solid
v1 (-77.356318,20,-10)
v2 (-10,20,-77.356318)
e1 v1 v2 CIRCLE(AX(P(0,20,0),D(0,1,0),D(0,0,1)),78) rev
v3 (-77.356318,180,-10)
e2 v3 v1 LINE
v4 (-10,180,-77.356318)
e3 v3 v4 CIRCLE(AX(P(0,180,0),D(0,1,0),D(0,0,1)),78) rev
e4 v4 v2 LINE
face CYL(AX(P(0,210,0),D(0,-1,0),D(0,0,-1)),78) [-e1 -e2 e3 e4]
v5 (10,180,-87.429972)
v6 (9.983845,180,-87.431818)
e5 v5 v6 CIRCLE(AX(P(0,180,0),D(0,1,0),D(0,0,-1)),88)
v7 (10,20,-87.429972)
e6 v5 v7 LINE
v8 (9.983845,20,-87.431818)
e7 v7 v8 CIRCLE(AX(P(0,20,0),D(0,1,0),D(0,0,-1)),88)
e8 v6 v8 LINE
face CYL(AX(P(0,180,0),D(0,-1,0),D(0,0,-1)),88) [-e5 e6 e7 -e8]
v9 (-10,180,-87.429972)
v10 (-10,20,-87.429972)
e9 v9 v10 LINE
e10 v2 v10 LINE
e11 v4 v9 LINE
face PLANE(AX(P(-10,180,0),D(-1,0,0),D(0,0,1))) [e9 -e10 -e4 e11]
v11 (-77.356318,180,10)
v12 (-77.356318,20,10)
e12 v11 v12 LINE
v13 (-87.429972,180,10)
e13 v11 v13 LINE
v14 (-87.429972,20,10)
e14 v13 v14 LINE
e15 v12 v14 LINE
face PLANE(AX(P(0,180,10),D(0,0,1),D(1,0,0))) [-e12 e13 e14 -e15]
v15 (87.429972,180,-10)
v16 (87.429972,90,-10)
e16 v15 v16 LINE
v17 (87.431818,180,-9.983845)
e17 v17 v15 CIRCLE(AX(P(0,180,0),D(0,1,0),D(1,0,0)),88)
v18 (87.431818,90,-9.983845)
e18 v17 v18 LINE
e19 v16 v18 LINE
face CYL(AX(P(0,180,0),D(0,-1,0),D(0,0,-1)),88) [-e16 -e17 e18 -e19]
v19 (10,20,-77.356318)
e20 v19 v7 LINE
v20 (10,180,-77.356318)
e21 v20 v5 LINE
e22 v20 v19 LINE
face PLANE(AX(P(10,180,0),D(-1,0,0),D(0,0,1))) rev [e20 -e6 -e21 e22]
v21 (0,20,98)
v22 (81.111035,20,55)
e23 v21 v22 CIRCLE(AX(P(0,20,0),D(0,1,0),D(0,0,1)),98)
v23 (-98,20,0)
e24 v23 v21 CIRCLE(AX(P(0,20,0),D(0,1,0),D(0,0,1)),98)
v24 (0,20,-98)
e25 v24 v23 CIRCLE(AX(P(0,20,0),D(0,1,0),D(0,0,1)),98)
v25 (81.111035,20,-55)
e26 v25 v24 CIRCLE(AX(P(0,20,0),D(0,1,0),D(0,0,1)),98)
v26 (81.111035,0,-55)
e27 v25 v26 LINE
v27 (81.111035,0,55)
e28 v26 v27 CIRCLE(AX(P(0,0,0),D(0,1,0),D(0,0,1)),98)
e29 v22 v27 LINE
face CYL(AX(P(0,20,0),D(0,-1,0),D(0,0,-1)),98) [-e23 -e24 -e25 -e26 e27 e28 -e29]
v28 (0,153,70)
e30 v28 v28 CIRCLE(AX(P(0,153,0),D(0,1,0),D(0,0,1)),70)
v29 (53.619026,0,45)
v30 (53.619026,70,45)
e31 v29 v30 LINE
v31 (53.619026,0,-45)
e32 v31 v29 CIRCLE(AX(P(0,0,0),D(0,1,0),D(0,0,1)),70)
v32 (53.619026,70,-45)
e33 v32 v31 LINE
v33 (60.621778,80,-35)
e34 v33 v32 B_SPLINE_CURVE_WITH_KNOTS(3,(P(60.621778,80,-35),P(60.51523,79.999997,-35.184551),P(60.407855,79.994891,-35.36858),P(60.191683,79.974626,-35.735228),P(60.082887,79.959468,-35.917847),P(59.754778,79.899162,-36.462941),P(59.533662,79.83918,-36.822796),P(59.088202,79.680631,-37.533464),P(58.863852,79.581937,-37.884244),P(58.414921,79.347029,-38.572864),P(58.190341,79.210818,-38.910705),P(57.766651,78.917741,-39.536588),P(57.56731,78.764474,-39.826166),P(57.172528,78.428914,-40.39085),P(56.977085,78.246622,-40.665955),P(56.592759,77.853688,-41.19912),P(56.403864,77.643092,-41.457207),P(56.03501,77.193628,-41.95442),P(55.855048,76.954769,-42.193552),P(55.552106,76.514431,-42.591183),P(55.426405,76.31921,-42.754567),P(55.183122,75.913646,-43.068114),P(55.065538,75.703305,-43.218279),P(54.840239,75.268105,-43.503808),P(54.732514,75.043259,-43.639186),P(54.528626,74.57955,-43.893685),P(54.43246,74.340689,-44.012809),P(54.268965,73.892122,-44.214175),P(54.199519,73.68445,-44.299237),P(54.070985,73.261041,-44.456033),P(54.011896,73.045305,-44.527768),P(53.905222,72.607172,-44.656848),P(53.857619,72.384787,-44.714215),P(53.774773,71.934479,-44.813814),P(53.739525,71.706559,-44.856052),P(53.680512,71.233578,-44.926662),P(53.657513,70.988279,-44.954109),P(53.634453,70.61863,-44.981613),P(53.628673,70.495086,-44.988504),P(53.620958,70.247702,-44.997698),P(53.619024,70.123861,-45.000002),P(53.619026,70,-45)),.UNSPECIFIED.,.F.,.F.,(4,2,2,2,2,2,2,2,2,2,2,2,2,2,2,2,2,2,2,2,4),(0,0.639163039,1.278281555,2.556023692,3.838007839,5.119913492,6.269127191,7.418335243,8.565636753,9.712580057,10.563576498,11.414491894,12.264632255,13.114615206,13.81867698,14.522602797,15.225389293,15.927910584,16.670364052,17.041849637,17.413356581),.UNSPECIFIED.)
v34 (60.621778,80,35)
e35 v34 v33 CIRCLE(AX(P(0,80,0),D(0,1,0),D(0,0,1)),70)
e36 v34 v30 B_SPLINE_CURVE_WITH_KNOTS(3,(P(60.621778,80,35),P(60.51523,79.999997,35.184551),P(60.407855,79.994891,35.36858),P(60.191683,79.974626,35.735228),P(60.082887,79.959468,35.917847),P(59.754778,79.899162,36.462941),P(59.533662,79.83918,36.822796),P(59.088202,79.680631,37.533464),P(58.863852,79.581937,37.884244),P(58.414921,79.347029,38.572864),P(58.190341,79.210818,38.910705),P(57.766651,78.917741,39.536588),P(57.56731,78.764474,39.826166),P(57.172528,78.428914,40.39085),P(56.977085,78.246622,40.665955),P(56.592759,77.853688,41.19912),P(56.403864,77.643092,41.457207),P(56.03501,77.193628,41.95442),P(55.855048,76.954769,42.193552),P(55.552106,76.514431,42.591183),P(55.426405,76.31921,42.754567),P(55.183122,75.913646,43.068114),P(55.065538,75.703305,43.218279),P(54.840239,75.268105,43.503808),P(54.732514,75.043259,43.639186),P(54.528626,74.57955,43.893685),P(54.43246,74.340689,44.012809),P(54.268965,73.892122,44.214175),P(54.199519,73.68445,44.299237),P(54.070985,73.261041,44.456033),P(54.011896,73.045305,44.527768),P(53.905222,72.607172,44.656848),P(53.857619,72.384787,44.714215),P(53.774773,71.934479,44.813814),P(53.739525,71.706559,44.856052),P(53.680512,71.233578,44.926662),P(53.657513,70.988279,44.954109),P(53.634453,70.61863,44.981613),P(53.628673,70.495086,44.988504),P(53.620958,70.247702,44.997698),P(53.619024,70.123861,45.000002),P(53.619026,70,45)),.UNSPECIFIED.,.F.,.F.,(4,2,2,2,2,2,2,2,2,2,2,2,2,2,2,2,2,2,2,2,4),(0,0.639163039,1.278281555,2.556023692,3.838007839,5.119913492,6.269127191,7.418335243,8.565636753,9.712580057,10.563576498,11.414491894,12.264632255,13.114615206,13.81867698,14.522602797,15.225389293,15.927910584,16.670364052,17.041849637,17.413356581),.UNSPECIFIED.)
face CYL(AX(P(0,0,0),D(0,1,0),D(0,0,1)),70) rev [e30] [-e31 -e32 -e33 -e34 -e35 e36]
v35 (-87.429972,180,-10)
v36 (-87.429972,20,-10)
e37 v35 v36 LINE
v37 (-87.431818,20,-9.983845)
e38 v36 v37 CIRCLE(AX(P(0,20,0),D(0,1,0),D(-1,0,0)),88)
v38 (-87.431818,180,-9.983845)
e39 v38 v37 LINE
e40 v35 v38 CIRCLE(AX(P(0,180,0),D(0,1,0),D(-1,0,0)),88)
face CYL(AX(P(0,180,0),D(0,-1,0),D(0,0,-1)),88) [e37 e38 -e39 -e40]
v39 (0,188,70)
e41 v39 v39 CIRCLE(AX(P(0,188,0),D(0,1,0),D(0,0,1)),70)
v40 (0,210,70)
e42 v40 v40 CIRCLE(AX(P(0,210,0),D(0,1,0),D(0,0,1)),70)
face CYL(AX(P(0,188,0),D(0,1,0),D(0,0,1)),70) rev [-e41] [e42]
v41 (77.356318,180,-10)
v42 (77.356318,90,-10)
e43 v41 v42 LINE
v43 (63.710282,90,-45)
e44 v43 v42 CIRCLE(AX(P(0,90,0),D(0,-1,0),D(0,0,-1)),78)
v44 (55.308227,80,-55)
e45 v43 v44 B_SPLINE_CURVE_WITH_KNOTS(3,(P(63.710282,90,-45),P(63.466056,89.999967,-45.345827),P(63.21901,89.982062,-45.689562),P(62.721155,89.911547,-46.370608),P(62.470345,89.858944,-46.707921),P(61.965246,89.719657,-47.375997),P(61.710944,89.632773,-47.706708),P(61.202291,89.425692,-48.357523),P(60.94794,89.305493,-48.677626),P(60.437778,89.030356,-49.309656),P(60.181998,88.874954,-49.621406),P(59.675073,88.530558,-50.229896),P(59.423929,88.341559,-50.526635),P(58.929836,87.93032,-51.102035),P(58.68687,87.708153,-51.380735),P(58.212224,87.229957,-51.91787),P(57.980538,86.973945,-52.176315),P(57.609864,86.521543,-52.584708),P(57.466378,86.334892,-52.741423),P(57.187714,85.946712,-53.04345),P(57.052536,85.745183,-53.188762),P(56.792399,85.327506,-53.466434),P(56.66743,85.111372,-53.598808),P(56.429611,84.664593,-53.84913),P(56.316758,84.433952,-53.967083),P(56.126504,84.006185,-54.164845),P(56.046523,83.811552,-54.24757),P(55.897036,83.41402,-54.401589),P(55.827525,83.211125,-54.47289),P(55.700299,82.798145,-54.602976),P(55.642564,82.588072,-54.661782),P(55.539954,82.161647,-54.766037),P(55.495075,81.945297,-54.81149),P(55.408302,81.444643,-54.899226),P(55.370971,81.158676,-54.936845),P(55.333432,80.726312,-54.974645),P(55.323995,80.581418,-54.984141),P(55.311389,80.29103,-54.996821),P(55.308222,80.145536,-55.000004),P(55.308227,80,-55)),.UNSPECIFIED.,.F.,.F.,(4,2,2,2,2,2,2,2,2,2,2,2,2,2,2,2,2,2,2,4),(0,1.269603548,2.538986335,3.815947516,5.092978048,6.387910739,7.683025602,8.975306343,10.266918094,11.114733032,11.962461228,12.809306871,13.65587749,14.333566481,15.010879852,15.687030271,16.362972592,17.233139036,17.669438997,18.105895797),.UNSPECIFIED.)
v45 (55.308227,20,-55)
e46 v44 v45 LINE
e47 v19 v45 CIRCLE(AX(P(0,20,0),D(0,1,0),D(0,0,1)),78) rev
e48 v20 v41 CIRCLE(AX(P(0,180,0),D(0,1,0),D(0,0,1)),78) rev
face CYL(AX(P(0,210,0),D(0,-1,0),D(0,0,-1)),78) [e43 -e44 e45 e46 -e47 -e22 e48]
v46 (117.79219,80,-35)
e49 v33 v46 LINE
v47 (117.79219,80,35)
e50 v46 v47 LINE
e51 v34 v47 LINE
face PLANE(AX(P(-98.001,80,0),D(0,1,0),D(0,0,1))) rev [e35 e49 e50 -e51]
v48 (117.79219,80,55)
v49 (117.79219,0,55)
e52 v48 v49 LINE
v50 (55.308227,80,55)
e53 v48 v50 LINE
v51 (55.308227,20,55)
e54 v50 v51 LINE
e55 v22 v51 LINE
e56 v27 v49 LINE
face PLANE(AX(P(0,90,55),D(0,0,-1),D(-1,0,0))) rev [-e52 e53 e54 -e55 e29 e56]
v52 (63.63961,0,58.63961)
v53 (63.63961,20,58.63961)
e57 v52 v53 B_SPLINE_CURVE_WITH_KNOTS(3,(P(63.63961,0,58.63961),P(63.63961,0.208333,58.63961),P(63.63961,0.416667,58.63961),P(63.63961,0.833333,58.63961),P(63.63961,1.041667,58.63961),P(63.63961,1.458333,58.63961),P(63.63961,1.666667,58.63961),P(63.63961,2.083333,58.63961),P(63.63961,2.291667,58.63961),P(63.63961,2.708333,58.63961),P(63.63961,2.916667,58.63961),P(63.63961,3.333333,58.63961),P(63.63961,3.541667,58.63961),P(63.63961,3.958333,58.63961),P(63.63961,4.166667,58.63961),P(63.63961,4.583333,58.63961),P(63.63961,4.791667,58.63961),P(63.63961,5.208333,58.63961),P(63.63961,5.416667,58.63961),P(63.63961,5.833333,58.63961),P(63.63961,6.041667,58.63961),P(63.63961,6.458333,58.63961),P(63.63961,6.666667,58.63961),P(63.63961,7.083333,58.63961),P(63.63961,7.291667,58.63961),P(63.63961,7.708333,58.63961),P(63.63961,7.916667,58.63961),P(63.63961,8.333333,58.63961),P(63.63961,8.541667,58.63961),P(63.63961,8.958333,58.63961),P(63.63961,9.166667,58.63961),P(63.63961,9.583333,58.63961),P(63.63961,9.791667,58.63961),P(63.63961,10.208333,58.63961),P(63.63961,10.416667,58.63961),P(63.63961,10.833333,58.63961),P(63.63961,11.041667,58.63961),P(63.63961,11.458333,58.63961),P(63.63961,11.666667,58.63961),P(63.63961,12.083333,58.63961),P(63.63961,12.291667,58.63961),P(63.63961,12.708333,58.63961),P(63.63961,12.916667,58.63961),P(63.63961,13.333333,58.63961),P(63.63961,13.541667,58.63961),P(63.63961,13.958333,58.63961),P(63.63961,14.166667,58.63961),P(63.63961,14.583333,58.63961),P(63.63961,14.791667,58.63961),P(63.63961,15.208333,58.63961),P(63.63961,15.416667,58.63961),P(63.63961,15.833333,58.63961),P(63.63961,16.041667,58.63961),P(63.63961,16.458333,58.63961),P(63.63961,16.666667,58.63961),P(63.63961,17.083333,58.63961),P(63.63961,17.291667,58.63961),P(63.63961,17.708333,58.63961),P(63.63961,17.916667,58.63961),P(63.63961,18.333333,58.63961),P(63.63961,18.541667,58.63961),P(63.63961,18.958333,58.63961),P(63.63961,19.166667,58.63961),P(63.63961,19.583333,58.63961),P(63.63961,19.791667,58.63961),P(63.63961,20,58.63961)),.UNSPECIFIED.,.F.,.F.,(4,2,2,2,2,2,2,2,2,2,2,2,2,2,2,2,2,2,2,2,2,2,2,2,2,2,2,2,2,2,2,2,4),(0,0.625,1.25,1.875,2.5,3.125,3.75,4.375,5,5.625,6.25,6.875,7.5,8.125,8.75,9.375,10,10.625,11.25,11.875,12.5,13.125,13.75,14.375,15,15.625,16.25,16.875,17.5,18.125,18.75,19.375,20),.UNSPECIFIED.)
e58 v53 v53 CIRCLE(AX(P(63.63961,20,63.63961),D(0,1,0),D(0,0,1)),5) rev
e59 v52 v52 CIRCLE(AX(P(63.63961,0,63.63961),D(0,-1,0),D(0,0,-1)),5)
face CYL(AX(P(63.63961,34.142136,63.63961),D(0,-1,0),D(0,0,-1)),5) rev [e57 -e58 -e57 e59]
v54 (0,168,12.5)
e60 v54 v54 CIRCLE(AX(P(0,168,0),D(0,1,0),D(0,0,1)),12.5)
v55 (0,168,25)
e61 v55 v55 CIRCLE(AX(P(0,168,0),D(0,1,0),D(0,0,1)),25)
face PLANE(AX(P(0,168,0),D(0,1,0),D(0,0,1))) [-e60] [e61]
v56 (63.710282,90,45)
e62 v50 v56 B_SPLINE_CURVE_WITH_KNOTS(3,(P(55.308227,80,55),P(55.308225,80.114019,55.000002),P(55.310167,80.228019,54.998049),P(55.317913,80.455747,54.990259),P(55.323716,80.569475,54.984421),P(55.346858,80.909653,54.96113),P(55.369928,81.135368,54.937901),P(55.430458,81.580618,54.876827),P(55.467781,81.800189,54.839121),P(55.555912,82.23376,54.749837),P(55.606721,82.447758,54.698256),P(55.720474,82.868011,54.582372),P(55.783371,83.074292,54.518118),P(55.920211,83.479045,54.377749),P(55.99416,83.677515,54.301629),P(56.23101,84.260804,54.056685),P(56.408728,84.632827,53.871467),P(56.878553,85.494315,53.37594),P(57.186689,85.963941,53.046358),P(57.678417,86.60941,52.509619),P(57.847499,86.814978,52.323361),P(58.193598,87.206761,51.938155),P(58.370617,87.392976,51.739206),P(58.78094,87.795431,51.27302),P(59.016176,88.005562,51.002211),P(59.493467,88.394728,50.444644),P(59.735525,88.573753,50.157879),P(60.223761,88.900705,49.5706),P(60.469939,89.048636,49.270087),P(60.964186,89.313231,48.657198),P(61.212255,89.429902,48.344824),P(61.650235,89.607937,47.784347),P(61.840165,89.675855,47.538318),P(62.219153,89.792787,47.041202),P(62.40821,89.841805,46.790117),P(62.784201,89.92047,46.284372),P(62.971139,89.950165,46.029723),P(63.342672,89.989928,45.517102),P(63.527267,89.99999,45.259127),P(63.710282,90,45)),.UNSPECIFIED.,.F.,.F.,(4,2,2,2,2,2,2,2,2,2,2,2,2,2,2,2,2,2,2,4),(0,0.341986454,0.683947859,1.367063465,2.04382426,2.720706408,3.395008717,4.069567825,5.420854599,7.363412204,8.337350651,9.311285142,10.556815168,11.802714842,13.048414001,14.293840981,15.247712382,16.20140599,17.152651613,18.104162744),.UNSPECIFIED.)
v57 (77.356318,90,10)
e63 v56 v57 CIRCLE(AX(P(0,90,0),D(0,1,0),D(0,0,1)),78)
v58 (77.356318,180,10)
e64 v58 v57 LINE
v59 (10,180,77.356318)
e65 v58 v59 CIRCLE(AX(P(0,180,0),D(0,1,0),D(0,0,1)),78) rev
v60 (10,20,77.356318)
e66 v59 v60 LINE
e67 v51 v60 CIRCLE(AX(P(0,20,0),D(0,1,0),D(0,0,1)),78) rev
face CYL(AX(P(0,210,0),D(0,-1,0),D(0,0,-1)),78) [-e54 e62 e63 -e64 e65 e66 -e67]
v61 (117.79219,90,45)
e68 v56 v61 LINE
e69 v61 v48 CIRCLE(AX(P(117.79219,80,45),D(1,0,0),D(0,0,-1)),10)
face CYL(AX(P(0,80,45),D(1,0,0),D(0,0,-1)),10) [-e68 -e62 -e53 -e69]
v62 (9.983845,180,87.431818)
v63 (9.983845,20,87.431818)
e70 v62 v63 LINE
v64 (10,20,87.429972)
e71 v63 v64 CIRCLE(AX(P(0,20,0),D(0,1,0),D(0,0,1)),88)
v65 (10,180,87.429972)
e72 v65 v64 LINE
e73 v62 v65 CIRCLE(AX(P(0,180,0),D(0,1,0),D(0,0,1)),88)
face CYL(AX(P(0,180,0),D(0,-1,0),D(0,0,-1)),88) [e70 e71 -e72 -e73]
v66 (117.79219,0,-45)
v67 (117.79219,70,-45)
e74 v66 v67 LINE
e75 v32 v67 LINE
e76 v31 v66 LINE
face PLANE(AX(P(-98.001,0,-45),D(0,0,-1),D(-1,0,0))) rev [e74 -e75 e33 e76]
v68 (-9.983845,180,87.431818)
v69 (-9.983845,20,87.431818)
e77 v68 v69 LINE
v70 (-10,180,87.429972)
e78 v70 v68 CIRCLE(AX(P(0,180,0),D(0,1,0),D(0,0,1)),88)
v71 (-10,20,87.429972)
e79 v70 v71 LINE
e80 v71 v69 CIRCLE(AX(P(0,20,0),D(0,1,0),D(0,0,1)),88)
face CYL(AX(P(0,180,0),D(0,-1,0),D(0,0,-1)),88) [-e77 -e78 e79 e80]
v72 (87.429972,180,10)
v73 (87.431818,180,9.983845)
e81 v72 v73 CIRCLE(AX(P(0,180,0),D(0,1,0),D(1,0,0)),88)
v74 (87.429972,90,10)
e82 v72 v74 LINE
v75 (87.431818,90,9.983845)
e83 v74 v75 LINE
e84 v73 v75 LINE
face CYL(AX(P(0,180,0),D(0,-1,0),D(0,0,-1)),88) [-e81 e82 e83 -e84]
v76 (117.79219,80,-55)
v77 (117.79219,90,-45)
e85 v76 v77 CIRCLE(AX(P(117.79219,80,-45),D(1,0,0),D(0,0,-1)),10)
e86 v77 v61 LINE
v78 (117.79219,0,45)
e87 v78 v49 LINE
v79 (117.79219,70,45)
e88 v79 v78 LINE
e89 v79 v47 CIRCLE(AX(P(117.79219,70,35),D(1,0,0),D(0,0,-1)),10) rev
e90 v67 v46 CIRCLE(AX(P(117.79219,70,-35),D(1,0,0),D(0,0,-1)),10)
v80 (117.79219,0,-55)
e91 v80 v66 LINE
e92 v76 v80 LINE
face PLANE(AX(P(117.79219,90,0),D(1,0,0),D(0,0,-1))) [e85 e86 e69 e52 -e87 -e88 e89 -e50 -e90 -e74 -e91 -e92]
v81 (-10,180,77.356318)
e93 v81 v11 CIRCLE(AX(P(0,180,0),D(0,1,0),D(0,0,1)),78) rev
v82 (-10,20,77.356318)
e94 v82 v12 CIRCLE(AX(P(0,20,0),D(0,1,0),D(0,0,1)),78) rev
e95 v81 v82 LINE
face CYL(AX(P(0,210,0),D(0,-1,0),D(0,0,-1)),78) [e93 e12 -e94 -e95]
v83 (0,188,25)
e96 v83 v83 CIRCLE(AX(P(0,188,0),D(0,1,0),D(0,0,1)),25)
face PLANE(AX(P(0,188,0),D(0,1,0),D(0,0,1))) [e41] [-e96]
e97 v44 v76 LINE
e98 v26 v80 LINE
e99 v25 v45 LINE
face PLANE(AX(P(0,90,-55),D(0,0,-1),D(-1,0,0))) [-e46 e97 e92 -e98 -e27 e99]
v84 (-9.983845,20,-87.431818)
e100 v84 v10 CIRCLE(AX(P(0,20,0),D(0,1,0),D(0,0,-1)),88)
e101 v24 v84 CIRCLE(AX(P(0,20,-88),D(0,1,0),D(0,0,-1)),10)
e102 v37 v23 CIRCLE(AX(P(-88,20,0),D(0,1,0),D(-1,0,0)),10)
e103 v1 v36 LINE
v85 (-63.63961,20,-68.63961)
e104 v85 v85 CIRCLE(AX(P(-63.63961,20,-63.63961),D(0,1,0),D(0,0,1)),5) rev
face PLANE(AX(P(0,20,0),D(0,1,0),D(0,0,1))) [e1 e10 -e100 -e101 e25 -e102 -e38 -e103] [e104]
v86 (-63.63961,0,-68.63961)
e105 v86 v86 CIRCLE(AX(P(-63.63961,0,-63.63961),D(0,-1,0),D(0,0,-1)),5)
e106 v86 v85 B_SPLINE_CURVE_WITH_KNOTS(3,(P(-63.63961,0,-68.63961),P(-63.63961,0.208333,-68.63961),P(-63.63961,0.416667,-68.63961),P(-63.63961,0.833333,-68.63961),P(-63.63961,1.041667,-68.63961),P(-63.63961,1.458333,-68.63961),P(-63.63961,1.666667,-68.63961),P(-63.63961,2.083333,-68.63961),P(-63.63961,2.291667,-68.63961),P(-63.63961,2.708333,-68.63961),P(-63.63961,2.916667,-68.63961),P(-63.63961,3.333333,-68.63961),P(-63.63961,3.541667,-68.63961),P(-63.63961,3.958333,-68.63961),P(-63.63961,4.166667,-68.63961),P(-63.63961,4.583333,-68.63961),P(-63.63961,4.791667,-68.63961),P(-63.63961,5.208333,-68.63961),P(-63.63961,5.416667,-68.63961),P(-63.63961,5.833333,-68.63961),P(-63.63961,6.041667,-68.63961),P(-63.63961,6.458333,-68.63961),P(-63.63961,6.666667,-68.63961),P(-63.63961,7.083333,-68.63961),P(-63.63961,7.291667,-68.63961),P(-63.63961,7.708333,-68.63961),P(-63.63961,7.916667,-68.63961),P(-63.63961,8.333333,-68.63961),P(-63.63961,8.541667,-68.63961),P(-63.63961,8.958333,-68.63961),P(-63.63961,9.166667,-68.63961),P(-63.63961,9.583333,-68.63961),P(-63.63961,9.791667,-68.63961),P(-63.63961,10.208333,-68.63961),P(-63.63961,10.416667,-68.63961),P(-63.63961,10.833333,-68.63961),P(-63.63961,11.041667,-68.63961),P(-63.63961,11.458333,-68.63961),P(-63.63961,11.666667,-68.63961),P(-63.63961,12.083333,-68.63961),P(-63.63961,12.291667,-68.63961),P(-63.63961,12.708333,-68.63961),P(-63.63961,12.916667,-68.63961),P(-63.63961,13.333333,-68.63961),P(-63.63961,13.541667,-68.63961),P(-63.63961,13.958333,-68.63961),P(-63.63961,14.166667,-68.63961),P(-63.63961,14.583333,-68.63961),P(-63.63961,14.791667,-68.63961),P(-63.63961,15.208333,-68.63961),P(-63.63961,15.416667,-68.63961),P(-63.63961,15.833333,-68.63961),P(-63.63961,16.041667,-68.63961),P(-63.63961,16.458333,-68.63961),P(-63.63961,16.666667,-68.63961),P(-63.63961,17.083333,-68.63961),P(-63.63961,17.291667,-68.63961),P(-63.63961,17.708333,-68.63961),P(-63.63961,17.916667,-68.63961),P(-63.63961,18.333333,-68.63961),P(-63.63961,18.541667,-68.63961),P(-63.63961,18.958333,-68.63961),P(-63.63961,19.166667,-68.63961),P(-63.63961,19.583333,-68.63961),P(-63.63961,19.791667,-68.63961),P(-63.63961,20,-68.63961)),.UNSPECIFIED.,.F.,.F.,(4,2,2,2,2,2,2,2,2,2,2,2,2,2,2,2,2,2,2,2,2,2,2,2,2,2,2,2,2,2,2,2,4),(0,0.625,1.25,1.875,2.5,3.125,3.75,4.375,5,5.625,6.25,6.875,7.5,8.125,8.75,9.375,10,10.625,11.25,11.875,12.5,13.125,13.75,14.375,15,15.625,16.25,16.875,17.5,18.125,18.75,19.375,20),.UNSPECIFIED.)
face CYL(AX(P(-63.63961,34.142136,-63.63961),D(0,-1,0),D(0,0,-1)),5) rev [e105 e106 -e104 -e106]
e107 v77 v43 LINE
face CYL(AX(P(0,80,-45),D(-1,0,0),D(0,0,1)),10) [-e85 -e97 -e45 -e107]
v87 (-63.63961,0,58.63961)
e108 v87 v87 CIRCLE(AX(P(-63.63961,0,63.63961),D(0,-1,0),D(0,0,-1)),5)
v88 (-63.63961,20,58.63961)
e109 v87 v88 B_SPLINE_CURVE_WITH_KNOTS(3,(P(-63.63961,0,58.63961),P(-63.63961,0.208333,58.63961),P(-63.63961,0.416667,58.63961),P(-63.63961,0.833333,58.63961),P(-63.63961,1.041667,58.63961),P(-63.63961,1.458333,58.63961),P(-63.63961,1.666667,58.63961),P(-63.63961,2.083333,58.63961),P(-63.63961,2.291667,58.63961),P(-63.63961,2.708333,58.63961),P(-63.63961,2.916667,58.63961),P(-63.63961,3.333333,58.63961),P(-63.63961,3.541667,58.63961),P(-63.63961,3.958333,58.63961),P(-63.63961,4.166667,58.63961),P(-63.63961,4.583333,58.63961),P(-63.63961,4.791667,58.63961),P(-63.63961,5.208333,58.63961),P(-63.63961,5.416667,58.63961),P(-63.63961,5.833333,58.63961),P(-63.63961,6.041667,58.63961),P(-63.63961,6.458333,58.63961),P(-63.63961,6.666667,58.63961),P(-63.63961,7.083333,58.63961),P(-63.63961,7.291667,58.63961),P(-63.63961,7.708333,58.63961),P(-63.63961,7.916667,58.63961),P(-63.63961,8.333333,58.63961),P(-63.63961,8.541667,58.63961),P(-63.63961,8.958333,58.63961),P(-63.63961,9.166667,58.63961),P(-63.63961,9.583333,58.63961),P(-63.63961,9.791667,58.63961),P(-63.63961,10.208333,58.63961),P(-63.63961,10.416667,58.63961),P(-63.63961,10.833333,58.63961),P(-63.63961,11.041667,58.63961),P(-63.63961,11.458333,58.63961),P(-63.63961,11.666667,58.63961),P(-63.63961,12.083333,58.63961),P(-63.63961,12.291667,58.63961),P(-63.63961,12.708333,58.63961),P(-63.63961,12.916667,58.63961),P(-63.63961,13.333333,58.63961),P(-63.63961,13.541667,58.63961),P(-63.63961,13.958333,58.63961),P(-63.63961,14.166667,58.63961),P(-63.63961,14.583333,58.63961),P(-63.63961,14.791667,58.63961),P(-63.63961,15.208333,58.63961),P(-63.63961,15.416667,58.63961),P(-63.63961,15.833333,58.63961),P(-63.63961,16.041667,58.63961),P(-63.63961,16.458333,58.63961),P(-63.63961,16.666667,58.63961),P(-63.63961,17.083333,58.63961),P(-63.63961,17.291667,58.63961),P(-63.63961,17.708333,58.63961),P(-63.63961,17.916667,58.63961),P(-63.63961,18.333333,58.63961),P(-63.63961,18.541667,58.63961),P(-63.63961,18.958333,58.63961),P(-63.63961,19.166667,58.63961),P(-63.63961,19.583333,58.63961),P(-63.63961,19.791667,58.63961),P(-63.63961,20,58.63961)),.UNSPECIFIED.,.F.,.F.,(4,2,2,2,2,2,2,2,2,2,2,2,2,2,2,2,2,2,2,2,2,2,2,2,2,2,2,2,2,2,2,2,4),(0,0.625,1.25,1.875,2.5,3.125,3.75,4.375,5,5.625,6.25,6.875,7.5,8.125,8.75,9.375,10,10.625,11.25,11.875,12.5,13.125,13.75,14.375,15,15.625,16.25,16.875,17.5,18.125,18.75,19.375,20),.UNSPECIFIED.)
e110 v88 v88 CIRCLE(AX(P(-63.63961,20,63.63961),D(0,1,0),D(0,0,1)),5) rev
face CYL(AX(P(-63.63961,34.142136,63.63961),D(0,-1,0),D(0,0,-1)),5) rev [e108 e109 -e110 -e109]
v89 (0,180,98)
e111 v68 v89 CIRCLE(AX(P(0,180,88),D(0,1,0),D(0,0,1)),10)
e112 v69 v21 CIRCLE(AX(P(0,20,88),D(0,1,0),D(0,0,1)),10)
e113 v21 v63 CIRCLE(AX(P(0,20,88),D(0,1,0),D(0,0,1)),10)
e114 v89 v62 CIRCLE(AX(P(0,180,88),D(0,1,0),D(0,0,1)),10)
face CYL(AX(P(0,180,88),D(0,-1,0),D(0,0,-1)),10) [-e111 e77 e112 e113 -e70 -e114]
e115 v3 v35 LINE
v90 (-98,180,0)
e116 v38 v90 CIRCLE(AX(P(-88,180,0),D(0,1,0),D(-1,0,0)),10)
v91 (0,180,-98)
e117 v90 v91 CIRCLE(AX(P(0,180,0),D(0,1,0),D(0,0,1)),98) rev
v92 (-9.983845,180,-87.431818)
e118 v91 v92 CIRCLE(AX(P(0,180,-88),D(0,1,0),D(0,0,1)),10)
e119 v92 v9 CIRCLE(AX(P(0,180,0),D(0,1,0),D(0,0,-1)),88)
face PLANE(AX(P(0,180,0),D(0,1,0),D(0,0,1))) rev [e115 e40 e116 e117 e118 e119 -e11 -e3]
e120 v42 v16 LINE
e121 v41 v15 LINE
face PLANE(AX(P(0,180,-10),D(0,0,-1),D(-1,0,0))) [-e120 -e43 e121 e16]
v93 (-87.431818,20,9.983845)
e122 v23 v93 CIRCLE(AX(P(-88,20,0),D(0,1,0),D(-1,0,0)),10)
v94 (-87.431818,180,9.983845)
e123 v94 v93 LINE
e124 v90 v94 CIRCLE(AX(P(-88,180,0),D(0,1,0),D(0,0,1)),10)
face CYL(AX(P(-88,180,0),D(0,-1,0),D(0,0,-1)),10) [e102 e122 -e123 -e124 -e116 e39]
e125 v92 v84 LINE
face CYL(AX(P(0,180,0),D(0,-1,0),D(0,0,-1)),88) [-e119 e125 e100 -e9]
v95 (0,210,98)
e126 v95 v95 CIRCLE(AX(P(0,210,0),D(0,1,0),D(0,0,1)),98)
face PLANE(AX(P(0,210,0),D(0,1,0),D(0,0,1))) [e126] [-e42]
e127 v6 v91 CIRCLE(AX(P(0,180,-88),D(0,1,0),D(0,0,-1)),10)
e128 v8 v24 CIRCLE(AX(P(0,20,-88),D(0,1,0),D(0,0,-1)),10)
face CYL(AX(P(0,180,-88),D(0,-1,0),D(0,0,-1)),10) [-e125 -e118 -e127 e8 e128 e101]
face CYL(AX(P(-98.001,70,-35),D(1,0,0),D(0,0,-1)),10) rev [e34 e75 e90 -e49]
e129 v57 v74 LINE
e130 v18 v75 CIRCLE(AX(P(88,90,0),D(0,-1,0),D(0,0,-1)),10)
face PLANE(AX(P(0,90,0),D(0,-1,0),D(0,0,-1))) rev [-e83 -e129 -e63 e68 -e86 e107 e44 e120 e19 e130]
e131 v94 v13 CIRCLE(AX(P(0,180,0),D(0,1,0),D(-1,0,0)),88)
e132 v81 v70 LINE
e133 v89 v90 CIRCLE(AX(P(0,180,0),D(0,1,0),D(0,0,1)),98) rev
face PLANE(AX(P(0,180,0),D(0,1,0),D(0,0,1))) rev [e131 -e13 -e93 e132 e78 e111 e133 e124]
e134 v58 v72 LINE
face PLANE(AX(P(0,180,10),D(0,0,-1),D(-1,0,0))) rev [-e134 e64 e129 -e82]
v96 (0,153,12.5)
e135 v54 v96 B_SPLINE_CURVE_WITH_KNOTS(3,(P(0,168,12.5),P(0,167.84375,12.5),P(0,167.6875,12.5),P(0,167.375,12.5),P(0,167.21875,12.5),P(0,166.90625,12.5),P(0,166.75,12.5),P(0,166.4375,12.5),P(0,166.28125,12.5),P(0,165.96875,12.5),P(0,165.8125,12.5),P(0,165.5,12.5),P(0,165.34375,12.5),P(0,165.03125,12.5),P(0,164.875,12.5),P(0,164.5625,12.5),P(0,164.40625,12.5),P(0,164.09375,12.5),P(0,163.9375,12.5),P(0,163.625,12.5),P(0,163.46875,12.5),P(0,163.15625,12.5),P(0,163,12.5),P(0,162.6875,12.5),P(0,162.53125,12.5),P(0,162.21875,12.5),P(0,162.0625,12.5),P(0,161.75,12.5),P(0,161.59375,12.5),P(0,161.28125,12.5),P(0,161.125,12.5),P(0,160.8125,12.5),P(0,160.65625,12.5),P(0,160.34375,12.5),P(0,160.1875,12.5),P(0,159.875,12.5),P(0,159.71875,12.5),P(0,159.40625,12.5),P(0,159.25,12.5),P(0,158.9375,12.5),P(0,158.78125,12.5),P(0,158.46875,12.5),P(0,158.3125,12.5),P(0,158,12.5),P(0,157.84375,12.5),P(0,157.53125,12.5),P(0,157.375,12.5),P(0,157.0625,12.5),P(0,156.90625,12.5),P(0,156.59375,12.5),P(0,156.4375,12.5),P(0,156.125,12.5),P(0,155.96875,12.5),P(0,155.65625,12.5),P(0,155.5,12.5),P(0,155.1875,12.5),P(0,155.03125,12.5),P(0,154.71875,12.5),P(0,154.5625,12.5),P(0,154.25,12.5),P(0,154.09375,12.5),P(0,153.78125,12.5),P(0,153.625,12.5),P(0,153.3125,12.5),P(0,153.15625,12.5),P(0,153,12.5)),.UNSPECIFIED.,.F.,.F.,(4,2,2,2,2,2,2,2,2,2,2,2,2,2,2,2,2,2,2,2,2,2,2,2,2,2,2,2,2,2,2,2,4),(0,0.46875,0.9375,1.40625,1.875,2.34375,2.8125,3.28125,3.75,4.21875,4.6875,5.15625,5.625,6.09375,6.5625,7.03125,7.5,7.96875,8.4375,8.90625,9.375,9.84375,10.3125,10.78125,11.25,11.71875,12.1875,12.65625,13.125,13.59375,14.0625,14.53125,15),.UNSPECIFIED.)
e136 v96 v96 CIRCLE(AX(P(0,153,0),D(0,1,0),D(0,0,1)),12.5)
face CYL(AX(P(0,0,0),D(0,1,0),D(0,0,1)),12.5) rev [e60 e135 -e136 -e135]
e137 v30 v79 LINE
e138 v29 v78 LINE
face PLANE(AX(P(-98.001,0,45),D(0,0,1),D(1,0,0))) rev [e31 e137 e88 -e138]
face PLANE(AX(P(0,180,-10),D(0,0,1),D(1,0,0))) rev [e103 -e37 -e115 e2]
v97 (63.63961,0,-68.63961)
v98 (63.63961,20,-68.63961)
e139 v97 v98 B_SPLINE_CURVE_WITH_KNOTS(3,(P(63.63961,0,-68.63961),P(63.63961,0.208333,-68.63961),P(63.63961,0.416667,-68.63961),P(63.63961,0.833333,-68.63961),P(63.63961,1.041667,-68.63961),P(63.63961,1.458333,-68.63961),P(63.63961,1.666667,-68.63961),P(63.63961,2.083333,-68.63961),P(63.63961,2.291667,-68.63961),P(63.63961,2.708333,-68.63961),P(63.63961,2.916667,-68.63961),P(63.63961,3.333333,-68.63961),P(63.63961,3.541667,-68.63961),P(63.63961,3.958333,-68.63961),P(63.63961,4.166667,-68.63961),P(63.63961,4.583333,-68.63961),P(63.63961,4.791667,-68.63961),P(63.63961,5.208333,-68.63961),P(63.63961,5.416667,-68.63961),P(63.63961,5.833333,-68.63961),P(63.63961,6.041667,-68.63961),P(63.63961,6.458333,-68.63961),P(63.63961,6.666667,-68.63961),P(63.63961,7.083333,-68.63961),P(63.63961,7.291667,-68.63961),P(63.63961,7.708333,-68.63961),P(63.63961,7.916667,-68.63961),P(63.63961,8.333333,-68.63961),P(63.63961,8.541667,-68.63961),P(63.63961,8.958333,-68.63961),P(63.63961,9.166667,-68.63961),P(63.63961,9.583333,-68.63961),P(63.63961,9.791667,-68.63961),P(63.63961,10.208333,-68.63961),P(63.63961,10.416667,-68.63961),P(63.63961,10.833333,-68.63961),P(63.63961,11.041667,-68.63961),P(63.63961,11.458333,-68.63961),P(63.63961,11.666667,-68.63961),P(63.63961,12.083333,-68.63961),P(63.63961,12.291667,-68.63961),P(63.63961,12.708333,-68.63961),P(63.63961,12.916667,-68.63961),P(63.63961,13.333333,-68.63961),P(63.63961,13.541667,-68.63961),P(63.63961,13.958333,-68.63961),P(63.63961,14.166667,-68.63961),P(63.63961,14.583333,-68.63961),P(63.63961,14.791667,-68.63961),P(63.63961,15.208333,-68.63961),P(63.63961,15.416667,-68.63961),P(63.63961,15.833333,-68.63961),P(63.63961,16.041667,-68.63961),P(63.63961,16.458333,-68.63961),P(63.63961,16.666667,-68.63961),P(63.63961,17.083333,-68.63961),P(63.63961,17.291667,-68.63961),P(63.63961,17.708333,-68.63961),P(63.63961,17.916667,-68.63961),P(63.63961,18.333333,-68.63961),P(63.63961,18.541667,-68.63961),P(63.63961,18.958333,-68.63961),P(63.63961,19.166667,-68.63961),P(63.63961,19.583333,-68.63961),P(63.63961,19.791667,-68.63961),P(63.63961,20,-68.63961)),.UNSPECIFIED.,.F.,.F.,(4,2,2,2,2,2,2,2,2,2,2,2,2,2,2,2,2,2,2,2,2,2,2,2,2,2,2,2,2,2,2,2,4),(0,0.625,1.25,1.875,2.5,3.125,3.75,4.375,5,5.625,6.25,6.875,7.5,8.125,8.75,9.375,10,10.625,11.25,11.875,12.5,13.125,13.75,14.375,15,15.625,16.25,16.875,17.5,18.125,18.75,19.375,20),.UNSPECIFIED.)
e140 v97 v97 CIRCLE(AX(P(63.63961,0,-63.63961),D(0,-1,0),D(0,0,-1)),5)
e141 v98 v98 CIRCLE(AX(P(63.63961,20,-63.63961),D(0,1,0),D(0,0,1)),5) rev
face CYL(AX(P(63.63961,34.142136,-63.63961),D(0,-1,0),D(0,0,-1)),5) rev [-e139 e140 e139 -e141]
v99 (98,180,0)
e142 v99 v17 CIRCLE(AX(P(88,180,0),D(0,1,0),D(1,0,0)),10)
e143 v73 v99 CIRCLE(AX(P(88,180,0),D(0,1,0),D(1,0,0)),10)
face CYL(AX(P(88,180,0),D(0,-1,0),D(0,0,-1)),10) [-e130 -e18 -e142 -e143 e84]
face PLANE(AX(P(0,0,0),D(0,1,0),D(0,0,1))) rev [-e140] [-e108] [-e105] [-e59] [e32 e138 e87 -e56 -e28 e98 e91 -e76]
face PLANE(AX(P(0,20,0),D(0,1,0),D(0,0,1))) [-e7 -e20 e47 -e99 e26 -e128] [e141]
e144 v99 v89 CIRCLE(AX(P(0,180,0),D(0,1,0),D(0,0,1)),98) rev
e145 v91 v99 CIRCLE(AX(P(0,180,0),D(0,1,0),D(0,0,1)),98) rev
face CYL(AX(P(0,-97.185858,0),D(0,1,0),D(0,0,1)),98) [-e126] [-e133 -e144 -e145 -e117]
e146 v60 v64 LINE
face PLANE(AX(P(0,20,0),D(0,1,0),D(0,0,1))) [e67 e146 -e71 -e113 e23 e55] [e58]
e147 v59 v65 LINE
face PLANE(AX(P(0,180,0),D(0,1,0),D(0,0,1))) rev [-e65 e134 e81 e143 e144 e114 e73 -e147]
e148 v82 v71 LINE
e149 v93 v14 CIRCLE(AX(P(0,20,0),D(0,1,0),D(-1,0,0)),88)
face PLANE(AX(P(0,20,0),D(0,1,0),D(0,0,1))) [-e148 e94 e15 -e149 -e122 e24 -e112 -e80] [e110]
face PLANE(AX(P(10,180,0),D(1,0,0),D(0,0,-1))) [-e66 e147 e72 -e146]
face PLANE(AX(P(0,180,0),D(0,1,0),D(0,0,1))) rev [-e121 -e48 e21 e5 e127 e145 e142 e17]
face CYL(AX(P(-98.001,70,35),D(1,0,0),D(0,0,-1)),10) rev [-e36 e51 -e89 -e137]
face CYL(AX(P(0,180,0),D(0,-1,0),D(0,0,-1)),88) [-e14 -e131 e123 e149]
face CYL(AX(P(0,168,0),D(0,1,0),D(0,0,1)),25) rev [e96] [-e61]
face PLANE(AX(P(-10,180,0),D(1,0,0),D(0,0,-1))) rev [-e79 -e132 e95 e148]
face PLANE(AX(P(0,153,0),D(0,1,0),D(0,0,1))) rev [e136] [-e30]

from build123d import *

# Parameters (mm, degrees)
SKETCH1_R               = 98
SKETCH1_R_2             = 78
BOSS_EXTRUDE1_DEPTH     = 20
SKETCH1_3_R             = 78
BOSS_EXTRUDE2_DEPTH     = 210
BOSS_EXTRUDE3_DEPTH     = 160
CIRPATTERN1_COUNT       = 4
BOSS_EXTRUDE4_START     = -30
SKETCH3_R               = 98
SKETCH3_R_2             = 78
BOSS_EXTRUDE4_DEPTH     = 30
SKETCH4_R               = 70
CUT_EXTRUDE1_DEPTH      = 22
SKETCH5_R               = 25
CUT_EXTRUDE2_DEPTH      = 20
CUT_EXTRUDE3_START      = -188
CUT_EXTRUDE3_OUTLINE_R  = 70
CUT_EXTRUDE3_DEPTH      = 153
SKETCH7_R               = 12.5
CUT_EXTRUDE4_DEPTH      = 218.788888605
BOSS_EXTRUDE6_DEPTH     = 90
FILLET1_R               = 10
CUT_EXTRUDE5_REACH      = 318.655
CUT_EXTRUDE5_END_RADIUS = 70
SKETCH12_R              = 5
CUT_EXTRUDE6_DEPTH      = 20


# Read off the part's stored shape, not the designer's step: Cut-Extrude3
with BuildPart() as part:
    # Sketch1 → Boss-Extrude1 (new body)
    # profile 1 of 2: a face of its own
    with BuildSketch(Plane(origin=(0, 0, 0), x_dir=(1, 0, 0), z_dir=(0, 1, 0))):
        with Locations(Location((0, 0, 0), (0, 0, 270))):
            Circle(SKETCH1_R)
        Circle(SKETCH1_R_2, mode=Mode.SUBTRACT)
    # profile 2 of 2: a face of its own
    with BuildSketch(Plane(origin=(0, 0, 0), x_dir=(1, 0, 0), z_dir=(0, 1, 0))):
        Circle(SKETCH1_R_2)
    extrude(amount=BOSS_EXTRUDE1_DEPTH)

    # Sketch1<3> → Boss-Extrude2 (add)
    with BuildSketch(Plane(origin=(0, 0, 0), x_dir=(1, 0, 0), z_dir=(0, 1, 0))):
        with Locations(Location((0, 0, 0), (0, 0, 270))):
            Circle(SKETCH1_3_R)
    extrude(amount=BOSS_EXTRUDE2_DEPTH)

    # Sketch2 → Boss-Extrude3 (add)
    with BuildSketch(Plane(origin=(0, 20, 0), x_dir=(1, 0, 0), z_dir=(0, 1, 0))):
        with BuildLine():
            ThreePointArc((9.983845423, -87.431818182), (6.867247692, -80.730824728), (-9e-09, -78))
            Line((0, -78), (0, -88))
            ThreePointArc((0, -88), (5, -87.857839718), (9.983845423, -87.431818182))
        make_face()
        with BuildLine():
            Line((0, -88), (0, -78))
            ThreePointArc((-9e-09, -78), (-6.867247699, -80.730824734), (-9.983845423, -87.431818182))
            ThreePointArc((-9.983845423, -87.431818182), (-5, -87.857839718), (0, -88))
        make_face()
        with BuildLine():
            ThreePointArc((9.983845423, -87.431818182), (5, -87.857839718), (0, -88))
            Line((0, -88), (0, -98))
            ThreePointArc((0, -98), (7.071067812, -95.071067812), (10, -88))
            ThreePointArc((10, -88), (9.99596054, -87.715794287), (9.983845423, -87.431818182))
        make_face()
        with BuildLine():
            Line((0, -98), (0, -88))
            ThreePointArc((0, -88), (-5, -87.857839718), (-9.983845423, -87.431818182))
            ThreePointArc((-9.983845423, -87.431818182), (-9.99596054, -87.715794287), (-10, -88))
            ThreePointArc((-10, -88), (-7.071067812, -95.071067812), (0, -98))
        make_face()
        with BuildLine():
            ThreePointArc((-9.983845423, -87.431818182), (-6.867247699, -80.730824734), (-9e-09, -78))
            ThreePointArc((-9e-09, -78), (-5.010347447, -77.838913266), (-10, -77.356318423))
            Line((-10, -77.356318423), (-10, -87.429971978))
            ThreePointArc((-10, -87.429971978), (-9.991922754, -87.430895453), (-9.983845423, -87.431818182))
        make_face()
        with BuildLine():
            ThreePointArc((10, -77.356318423), (5.010347438, -77.838913267), (-9e-09, -78))
            ThreePointArc((-9e-09, -78), (6.867247692, -80.730824728), (9.983845423, -87.431818182))
            ThreePointArc((9.983845423, -87.431818182), (9.991922754, -87.430895453), (10, -87.429971978))
            Line((10, -87.429971978), (10, -77.356318423))
        make_face()
    boss_extrude3 = extrude(amount=BOSS_EXTRUDE3_DEPTH)

    # CirPattern1: Boss-Extrude3 ×4 about axis
    cirpattern1_axis = Axis((0, 0, 0), (0, 1, 0))
    for i in range(1, CIRPATTERN1_COUNT):
        add(boss_extrude3.rotate(cirpattern1_axis, i * 360 / CIRPATTERN1_COUNT))

    # Sketch3 → Boss-Extrude4 (add)
    with BuildSketch(Plane(origin=(0, 210, 0), x_dir=(1, 0, 0), z_dir=(0, 1, 0)).offset(BOSS_EXTRUDE4_START)):
        with Locations(Location((0, 0, 0), (0, 0, 270))):
            Circle(SKETCH3_R)
        Circle(SKETCH3_R_2, mode=Mode.SUBTRACT)
    extrude(amount=BOSS_EXTRUDE4_DEPTH)

    # Sketch4 → Cut-Extrude1 (cut)
    with BuildSketch(Plane(origin=(0, 210, 0), x_dir=(1, 0, 0), z_dir=(0, 1, 0))):
        with Locations(Location((0, 0, 0), (0, 0, 270))):
            Circle(SKETCH4_R)
    extrude(amount=-CUT_EXTRUDE1_DEPTH, mode=Mode.SUBTRACT)

    # Sketch5 → Cut-Extrude2 (cut)
    with BuildSketch(Plane(origin=(0, 188, 0), x_dir=(1, 0, 0), z_dir=(0, 1, 0))):
        with Locations(Location((0, 0, 0), (0, 0, 270))):
            Circle(SKETCH5_R)
    extrude(amount=-CUT_EXTRUDE2_DEPTH, mode=Mode.SUBTRACT)

    # Cut-Extrude3 outline → Cut-Extrude3 (cut)
    with BuildSketch(Plane(origin=(0, 188, 0), x_dir=(1, 0, 0), z_dir=(0, 1, 0)).offset(CUT_EXTRUDE3_START)):
        Circle(CUT_EXTRUDE3_OUTLINE_R)
    extrude(amount=CUT_EXTRUDE3_DEPTH, mode=Mode.SUBTRACT)

    # Sketch7 → Cut-Extrude4 (cut, through all)
    with BuildSketch(Plane(origin=(0, 168, 0), x_dir=(1, 0, 0), z_dir=(0, 1, 0))):
        with Locations(Location((0, 0, 0), (0, 0, 270))):
            Circle(SKETCH7_R)
    extrude(amount=-CUT_EXTRUDE4_DEPTH, mode=Mode.SUBTRACT)

    # Sketch10 → Boss-Extrude6 (add)
    with BuildSketch(Plane.XZ):
        with BuildLine():
            Line((117.792189894, 0), (98, 0))
            ThreePointArc((98, 0), (93.68265963, -28.767330162), (81.111035008, -55))
            Line((81.111035008, -55), (117.792189894, -55))
            Line((117.792189894, -55), (117.792189894, 0))
        make_face()
        with BuildLine():
            ThreePointArc((81.111035008, -55), (93.68265963, -28.767330162), (98, 0))
            ThreePointArc((98, 0), (94.867247695, -7.269175269), (87.431818182, -9.983845423))
            Line((87.431818182, -9.983845423), (87.429971978, -10))
            Line((87.429971978, -10), (77.356318423, -10))
            ThreePointArc((77.356318423, -10), (70.04441747, -34.318793412), (55.308227236, -55))
            Line((55.308227236, -55), (81.111035008, -55))
        make_face()
    boss_extrude6 = extrude(amount=-BOSS_EXTRUDE6_DEPTH)

    # Mirror1: Boss-Extrude6 across plane
    add(boss_extrude6.mirror(Plane.XY))

    # Fillet1
    fillet1_edges = [part.edges().sort_by_distance(p)[0] for p in [
        (86.550208565, 90, -55),
        (86.550208565, 90, 55),
    ]]
    fillet(fillet1_edges, radius=FILLET1_R)

    # Cut-Extrude5: up to this cylinder (the profile starts outside it)
    cut_extrude5_end = Plane(origin=(0, 39.773519, 0), z_dir=(0, 1, 0)) * Cylinder(CUT_EXTRUDE5_END_RADIUS, 778.31, mode=Mode.PRIVATE)
    # Sketch11 → Cut-Extrude5 (cut, up to the surface)
    with BuildSketch(Plane(origin=(117.792189894, 0, 0), x_dir=(0, 0, -1), z_dir=(1, 0, 0)), mode=Mode.PRIVATE) as cut_extrude5_sk1:
        with BuildLine():
            Line((-45, 0), (45, 0))
            Line((45, 0), (45, 70))
            ThreePointArc((45, 70), (42.071067812, 77.071067812), (35, 80))
            Line((35, 80), (-35, 80))
            ThreePointArc((-35, 80), (-42.071067812, 77.071067812), (-45, 70))
            Line((-45, 70), (-45, 0))
        make_face()
    cut_extrude5_tool1 = extrude(cut_extrude5_sk1.sketch, amount=-CUT_EXTRUDE5_REACH, mode=Mode.PRIVATE) - cut_extrude5_end
    add(cut_extrude5_tool1.solids().sort_by_distance((117.79219, 39.773519, 0))[0], mode=Mode.SUBTRACT)

    # Sketch12 → Cut-Extrude6 (cut)
    with BuildSketch(Plane.XZ):
        with Locations(Location((-63.639610307, 63.639610307, 0), (0, 0, 270))):
            Circle(SKETCH12_R)
        with Locations(Location((63.639610307, 63.639610307, 0), (0, 0, 270))):
            Circle(SKETCH12_R)
        with Locations(Location((63.639610307, -63.639610307, 0), (0, 0, 270))):
            Circle(SKETCH12_R)
        with Locations(Location((-63.639610307, -63.639610307, 0), (0, 0, 270))):
            Circle(SKETCH12_R)
    extrude(amount=-CUT_EXTRUDE6_DEPTH, mode=Mode.SUBTRACT)


solid = part.part
